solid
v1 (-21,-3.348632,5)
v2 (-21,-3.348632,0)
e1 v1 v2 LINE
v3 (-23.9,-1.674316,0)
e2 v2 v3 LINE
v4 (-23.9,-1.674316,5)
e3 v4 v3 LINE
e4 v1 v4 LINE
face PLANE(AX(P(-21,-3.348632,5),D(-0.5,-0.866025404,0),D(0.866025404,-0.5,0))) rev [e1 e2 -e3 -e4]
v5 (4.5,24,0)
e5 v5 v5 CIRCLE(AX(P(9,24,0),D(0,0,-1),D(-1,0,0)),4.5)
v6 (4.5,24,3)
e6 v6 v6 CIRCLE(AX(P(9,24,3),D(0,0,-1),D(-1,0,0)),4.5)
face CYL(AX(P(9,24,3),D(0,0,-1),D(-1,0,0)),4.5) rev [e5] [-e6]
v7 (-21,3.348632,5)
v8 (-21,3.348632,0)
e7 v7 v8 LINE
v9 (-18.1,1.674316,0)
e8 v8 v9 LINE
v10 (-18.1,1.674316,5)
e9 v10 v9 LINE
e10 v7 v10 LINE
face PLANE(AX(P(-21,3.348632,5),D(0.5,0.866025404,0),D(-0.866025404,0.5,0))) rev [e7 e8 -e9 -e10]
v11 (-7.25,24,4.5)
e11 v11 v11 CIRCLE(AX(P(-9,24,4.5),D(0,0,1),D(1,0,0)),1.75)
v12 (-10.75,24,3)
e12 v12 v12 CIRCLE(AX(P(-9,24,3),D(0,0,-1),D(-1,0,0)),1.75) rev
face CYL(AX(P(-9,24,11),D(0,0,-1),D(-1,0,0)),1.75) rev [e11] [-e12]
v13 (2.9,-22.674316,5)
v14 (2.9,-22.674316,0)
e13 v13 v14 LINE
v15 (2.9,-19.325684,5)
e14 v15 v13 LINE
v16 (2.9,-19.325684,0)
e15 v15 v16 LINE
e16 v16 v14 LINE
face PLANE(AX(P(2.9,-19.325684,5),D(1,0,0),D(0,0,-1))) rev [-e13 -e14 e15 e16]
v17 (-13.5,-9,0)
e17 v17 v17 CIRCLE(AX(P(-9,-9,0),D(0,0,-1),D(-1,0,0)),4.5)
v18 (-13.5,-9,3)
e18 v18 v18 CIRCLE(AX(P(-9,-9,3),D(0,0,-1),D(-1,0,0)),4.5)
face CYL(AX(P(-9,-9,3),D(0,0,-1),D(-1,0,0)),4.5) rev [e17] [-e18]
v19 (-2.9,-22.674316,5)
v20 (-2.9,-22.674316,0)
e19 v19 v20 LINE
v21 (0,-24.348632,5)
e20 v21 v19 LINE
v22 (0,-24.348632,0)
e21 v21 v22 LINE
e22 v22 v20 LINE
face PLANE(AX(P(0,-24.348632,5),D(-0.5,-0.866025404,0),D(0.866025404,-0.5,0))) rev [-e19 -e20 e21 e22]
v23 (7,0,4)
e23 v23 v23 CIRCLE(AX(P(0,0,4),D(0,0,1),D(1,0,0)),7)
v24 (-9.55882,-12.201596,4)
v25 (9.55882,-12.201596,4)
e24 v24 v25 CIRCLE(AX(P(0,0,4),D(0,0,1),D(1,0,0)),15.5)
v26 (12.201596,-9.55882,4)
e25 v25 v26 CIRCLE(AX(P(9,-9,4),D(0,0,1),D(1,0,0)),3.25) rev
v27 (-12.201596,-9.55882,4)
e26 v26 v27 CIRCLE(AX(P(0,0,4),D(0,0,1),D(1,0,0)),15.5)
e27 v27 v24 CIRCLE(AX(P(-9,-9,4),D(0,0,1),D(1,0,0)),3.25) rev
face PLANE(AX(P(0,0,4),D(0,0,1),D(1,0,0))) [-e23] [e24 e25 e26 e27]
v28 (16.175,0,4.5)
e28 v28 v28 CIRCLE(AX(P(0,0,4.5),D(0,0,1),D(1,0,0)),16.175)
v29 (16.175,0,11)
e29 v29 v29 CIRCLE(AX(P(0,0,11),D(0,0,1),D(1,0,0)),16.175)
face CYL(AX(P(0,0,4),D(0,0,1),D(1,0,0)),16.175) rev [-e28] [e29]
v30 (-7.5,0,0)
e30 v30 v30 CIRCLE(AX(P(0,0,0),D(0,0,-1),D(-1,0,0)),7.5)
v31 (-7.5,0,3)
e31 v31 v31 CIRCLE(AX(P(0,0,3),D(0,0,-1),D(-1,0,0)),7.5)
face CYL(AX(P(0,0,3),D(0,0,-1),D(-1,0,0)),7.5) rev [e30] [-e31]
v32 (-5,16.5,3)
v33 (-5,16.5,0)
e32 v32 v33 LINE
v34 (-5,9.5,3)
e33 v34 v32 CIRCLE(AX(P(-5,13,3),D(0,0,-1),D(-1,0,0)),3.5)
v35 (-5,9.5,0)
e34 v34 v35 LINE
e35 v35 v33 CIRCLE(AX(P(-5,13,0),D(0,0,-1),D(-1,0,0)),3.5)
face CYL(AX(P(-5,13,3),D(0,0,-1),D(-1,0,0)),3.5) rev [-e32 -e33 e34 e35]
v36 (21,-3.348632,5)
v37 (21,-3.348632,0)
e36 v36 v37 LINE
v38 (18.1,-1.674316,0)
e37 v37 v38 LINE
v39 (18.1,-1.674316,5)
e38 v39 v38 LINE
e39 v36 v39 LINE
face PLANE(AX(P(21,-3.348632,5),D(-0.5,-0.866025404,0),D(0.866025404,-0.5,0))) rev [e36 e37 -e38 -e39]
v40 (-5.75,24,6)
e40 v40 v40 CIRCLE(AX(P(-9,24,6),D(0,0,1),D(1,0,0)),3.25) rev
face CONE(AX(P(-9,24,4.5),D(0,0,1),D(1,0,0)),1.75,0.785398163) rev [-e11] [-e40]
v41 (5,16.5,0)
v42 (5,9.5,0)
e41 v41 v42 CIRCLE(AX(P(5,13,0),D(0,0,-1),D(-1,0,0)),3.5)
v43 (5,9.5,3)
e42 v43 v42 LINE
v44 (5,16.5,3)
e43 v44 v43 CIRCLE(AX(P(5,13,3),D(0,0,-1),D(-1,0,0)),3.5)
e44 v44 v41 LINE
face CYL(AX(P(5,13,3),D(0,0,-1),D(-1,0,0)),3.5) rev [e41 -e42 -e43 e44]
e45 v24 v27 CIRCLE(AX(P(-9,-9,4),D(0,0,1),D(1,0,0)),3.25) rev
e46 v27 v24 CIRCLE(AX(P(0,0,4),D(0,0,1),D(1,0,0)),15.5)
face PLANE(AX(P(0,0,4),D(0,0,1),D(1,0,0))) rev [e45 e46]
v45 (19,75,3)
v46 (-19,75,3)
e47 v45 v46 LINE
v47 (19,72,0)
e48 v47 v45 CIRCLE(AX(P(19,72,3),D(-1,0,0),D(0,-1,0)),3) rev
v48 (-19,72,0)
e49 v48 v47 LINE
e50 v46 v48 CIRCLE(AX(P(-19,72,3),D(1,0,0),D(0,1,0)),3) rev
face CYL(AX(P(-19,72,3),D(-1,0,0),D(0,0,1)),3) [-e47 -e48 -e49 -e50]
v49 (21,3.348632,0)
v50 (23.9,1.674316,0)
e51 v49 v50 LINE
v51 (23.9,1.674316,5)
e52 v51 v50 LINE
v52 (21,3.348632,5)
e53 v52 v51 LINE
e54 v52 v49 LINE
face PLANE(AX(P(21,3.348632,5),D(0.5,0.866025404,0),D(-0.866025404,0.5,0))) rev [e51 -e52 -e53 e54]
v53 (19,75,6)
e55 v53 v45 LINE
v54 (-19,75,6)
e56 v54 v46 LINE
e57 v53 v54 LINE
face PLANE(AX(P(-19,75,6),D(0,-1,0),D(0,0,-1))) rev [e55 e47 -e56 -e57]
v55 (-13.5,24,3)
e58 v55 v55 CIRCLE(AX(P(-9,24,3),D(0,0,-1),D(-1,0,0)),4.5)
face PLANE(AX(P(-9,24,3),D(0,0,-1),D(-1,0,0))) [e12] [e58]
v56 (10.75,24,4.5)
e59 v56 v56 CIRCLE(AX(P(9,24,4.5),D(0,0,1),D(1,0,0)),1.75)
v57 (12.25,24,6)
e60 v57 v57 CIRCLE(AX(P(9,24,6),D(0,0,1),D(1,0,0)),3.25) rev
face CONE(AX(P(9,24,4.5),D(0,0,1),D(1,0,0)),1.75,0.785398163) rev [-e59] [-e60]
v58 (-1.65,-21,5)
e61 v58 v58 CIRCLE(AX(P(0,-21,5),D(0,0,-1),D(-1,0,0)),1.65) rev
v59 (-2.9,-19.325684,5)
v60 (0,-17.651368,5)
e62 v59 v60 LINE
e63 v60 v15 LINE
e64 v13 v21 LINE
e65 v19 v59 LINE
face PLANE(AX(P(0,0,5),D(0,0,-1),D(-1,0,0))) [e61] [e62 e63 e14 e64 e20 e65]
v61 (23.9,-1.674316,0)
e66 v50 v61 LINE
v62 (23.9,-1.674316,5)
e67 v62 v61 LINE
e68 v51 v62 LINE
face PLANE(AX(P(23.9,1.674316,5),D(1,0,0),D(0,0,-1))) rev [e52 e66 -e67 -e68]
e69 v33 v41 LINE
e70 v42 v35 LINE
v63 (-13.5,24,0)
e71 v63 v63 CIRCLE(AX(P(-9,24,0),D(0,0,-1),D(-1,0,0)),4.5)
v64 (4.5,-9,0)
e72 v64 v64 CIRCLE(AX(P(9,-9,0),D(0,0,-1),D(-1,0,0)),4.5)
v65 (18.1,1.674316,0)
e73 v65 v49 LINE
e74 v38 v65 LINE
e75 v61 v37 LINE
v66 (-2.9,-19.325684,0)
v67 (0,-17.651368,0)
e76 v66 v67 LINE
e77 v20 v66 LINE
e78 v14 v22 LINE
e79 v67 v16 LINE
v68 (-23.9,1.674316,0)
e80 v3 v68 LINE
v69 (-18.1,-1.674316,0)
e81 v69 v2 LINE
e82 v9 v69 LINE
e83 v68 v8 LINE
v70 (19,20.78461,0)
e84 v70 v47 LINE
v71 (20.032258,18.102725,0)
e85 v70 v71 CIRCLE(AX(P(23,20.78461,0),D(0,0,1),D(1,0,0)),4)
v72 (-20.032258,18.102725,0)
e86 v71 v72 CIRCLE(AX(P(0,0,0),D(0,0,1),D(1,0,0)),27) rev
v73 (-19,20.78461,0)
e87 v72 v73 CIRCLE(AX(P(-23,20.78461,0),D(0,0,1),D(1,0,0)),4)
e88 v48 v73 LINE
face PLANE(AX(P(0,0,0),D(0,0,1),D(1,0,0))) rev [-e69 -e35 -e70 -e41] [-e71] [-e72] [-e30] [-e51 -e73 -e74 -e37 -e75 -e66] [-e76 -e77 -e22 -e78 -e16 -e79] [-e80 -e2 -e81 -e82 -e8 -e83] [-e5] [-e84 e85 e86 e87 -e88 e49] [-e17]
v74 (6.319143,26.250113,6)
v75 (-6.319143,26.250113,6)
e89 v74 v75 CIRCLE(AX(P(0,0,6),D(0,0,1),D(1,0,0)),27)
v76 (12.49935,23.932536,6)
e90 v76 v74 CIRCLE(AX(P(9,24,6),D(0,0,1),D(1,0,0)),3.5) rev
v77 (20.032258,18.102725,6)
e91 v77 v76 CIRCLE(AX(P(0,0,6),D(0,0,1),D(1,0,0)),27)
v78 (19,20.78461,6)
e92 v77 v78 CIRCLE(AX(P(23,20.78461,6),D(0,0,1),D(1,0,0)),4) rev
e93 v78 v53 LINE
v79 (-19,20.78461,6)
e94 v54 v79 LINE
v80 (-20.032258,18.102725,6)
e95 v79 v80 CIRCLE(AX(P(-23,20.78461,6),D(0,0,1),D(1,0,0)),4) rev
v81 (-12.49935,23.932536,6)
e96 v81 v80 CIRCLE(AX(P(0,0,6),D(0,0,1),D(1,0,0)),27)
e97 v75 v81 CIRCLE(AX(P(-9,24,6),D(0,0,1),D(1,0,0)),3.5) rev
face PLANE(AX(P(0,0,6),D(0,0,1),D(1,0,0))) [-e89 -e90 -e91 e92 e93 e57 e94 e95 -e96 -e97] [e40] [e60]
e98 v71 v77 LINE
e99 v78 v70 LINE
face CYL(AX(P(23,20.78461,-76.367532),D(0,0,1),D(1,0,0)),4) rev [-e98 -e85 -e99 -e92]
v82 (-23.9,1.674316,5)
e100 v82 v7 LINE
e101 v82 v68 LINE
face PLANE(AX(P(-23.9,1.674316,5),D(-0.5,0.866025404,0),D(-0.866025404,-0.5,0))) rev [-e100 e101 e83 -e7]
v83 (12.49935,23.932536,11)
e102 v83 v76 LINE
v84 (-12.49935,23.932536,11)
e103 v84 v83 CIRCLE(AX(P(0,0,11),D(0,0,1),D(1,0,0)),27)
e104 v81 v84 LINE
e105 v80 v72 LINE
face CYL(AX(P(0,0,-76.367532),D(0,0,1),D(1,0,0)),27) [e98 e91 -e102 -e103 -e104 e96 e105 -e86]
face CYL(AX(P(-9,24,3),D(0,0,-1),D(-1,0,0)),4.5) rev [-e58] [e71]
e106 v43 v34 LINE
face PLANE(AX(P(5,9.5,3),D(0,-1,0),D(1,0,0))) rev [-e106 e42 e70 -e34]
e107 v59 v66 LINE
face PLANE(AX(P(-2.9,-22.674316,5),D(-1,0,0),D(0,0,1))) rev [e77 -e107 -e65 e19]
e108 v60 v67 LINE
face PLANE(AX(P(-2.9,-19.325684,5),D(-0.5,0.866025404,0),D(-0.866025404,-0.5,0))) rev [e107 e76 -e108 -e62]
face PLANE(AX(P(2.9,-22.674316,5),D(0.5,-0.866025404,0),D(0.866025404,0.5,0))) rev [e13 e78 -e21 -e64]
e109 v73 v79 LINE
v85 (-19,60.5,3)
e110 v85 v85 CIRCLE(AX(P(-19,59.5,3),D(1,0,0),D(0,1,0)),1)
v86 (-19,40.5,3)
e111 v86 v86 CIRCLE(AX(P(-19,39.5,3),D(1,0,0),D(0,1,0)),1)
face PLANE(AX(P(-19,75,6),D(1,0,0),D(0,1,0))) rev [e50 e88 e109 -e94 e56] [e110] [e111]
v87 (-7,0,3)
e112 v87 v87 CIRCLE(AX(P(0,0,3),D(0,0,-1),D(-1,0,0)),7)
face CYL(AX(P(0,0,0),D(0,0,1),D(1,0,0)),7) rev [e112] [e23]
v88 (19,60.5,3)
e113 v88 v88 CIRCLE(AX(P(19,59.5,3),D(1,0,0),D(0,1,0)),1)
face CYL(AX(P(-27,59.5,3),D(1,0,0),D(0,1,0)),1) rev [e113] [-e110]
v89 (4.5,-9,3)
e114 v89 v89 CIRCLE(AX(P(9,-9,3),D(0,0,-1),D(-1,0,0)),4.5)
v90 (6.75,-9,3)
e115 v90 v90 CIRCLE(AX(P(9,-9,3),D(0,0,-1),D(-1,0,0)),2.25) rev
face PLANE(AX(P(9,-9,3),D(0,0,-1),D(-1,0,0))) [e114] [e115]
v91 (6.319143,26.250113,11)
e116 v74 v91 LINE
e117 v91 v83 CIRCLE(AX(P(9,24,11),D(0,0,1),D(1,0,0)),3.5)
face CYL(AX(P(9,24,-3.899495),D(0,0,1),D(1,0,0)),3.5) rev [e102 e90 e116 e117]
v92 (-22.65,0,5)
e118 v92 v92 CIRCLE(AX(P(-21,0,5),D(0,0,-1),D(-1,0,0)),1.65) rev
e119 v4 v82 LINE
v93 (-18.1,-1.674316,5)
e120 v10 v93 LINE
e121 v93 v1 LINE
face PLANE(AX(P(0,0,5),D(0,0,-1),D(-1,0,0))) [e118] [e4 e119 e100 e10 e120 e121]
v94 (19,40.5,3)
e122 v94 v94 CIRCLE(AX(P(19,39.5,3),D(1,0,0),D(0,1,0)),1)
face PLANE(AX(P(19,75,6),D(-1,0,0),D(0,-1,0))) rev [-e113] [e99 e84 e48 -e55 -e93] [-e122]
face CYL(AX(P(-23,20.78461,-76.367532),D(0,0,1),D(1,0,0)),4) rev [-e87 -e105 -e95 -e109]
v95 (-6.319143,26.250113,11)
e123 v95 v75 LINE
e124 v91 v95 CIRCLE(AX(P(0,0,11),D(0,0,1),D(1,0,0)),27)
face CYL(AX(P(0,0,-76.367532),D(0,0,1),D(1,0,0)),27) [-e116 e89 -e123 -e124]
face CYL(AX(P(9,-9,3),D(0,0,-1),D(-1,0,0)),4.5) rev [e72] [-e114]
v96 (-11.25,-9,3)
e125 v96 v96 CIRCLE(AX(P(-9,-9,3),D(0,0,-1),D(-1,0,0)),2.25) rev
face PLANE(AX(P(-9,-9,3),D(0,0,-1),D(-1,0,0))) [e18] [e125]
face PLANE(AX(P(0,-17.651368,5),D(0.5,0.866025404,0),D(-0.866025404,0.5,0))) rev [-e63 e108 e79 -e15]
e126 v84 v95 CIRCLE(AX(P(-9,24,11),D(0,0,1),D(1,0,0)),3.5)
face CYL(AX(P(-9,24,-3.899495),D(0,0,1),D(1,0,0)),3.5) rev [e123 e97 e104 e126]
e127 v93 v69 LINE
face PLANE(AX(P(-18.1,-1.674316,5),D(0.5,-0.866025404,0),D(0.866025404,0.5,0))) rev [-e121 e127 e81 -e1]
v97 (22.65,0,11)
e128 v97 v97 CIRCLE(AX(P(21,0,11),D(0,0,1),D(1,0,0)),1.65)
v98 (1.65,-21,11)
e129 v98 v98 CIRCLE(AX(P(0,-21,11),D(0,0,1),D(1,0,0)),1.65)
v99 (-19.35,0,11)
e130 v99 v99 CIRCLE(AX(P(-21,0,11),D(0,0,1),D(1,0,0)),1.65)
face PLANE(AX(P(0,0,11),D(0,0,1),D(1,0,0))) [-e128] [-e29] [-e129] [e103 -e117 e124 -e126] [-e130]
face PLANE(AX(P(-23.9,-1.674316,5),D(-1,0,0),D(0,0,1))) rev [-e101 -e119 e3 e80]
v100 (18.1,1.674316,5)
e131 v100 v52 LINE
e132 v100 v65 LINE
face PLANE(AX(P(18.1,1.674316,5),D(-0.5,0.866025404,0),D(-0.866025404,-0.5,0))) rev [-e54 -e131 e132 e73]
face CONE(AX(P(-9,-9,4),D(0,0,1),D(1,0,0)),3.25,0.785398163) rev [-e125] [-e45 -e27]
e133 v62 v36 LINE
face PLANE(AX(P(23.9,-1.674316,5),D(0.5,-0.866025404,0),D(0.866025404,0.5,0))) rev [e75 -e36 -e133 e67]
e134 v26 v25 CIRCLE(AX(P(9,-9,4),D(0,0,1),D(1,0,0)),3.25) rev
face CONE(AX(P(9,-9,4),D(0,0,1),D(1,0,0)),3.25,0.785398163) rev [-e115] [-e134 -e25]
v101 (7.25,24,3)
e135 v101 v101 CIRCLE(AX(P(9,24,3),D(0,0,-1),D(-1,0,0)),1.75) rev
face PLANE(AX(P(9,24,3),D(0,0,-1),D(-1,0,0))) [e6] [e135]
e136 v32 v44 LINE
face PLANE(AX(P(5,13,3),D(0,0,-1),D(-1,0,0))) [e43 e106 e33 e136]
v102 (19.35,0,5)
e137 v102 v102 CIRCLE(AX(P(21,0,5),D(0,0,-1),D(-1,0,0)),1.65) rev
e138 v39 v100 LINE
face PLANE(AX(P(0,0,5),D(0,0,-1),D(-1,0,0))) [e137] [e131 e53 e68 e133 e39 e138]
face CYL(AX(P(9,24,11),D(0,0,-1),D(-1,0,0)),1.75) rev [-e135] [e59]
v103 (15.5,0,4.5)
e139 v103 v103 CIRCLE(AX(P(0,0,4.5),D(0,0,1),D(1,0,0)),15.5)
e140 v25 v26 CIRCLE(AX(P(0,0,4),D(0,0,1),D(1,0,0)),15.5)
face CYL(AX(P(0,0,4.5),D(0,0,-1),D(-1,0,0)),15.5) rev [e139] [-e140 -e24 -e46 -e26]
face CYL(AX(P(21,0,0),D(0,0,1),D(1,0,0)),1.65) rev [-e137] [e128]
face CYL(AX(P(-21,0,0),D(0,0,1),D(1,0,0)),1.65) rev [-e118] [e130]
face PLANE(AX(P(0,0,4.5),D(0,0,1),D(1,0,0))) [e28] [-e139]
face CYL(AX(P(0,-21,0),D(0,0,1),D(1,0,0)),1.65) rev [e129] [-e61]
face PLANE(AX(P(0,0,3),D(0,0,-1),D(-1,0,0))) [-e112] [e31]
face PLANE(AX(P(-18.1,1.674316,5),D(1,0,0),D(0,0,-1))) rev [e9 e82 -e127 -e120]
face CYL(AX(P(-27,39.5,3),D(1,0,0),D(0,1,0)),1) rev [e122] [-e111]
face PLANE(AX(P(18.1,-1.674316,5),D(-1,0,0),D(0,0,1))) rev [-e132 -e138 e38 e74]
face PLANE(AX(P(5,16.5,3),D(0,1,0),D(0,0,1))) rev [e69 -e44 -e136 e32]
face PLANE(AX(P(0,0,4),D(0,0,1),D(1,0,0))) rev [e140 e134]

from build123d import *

# Parameters (mm, degrees)
SKETCH_1_W                    = 38
SKETCH_1_H                    = 94
EXTRUDE_604_DEPTH             = 6
CUT_EXTRUDE_1_DEPTH           = 78.601546376
CUT_EXTRUDE_1_DEPTH_BACK      = 78.601546376
SKETCH_5_R                    = 5
SKETCH_8_R                    = 27
EXTRUDE_996_DEPTH             = 5
EXTRUDE_996_DIRECTION_2_REACH = 79.602
SKETCH_6_R                    = 1.75
CUT_EXTRUDE_1278_DEPTH        = 81.467384697
SKETCH_16_R                   = 16.175
CUT_EXTRUDE_1486_DEPTH        = 7
SKETCH_7_R                    = 4.5
SKETCH_7_R_2                  = 7.5
CUT_EXTRUDE_1931_DEPTH        = 3
SKETCH_10_R                   = 3.5
CUT_EXTRUDE_2130_DEPTH        = 5
SKETCH_11_R                   = 1.65
CUT_EXTRUDE_2456_DEPTH        = 81.467384697
CUT_EXTRUDE_3_DEPTH           = 5
CHAMFER_1_SIZE                = 1.5
FILLET_5_R                    = 4
SKETCH_17_R                   = 7
CUT_EXTRUDE_3397_DEPTH        = 81.018747803
EXTRUDE_START                 = 0.5
SKETCH_18_R                   = 16.175
SKETCH_18_R_2                 = 15.5
EXTRUDE_3543_DEPTH            = 0.5
SKETCH_19_R                   = 1
CUT_EXTRUDE_3835_DEPTH        = 89.667919791
FILLET_6_R                    = 3


with BuildPart() as part:
    # Эскиз1 → Extrude 604 (new body)
    with BuildSketch(Plane.XY):
        with Locations((0, 28)):
            Rectangle(SKETCH_1_W, SKETCH_1_H)
    extrude(amount=EXTRUDE_604_DEPTH)

    # Эскиз5 → ось двигателя1 (cut, two sides: drawn at the far end of the back side and taken through both)
    with BuildSketch(Plane.XY.offset(6).offset(-CUT_EXTRUDE_1_DEPTH_BACK)):
        Circle(SKETCH_5_R)
    extrude(amount=CUT_EXTRUDE_1_DEPTH + CUT_EXTRUDE_1_DEPTH_BACK, mode=Mode.SUBTRACT)

    # Эскиз8 → Extrude 996 (add)
    with BuildSketch(Plane.XY.offset(6)):
        Circle(SKETCH_8_R)
    extrude(amount=EXTRUDE_996_DEPTH)

    # Extrude 996 direction 2: up to this face of the body (flat: up to its plane)
    extrude_996_direction_2_end = Plane(part.part.faces().sort_by_distance((0, 28.629494754, 0))[0])
    # Эскиз8 → Extrude 996 direction 2 (add, up to the picked face)
    with BuildSketch(Plane.XY.offset(6), mode=Mode.PRIVATE) as extrude_996_direction_2_sk1:
        Circle(SKETCH_8_R)
    extrude_996_direction_2_tool1 = split(extrude(extrude_996_direction_2_sk1.sketch, amount=-EXTRUDE_996_DIRECTION_2_REACH, mode=Mode.PRIVATE), bisect_by=extrude_996_direction_2_end, keep=Keep.BOTH, mode=Mode.PRIVATE)
    add(extrude_996_direction_2_tool1.solids().sort_by(Axis((0, 0, 6), (0, 0, -1)))[0])

    # Эскиз6 → Cut-Extrude 1278 (cut, through all)
    with BuildSketch(Plane(origin=(0, 0, 0), x_dir=(-1, 0, 0), z_dir=(0, 0, -1))):
        with Locations((-9, 24)):
            Circle(SKETCH_6_R)
        with Locations((9, 24)):
            Circle(SKETCH_6_R)
        with Locations((9, -9)):
            Circle(SKETCH_6_R)
        with Locations((-9, -9)):
            Circle(SKETCH_6_R)
    extrude(amount=-CUT_EXTRUDE_1278_DEPTH, mode=Mode.SUBTRACT)

    # Эскиз16 → Cut-Extrude 1486 (cut)
    with BuildSketch(Plane.XY.offset(11)):
        Circle(SKETCH_16_R)
    extrude(amount=-CUT_EXTRUDE_1486_DEPTH, mode=Mode.SUBTRACT)

    # Эскиз7 → Cut-Extrude 1931 (cut)
    with BuildSketch(Plane(origin=(0, 0, 0), x_dir=(-1, 0, 0), z_dir=(0, 0, -1))):
        with Locations((-9, 24)):
            Circle(SKETCH_7_R)
        with Locations((9, 24)):
            Circle(SKETCH_7_R)
        with Locations((-9, -9)):
            Circle(SKETCH_7_R)
        with Locations((9, -9)):
            Circle(SKETCH_7_R)
        Circle(SKETCH_7_R_2)
        with BuildLine():
            Line((-5, 16.5), (5, 16.5))
            ThreePointArc((5, 16.5), (8.5, 13), (5, 9.5))
            Line((5, 9.5), (-5, 9.5))
            ThreePointArc((-5, 9.5), (-8.5, 13), (-5, 16.5))
        make_face()
    extrude(amount=-CUT_EXTRUDE_1931_DEPTH, mode=Mode.SUBTRACT)

    # Эскиз10 → Cut-Extrude 2130 (cut)
    with BuildSketch(Plane.XY.offset(11)):
        with Locations((-9, 24)):
            Circle(SKETCH_10_R)
        with Locations((9, 24)):
            Circle(SKETCH_10_R)
    extrude(amount=-CUT_EXTRUDE_2130_DEPTH, mode=Mode.SUBTRACT)

    # Эскиз11 → Cut-Extrude 2456 (cut, through all)
    with BuildSketch(Plane.XY.offset(11)):
        with Locations((21, 0)):
            Circle(SKETCH_11_R)
        with Locations((-21, 0)):
            Circle(SKETCH_11_R)
        with Locations((0, -21)):
            Circle(SKETCH_11_R)
    extrude(amount=-CUT_EXTRUDE_2456_DEPTH, mode=Mode.SUBTRACT)

    # Эскиз12 → Вырез-Вытянуть3 (cut)
    with BuildSketch(Plane(origin=(0, 0, 0), x_dir=(-1, 0, 0), z_dir=(0, 0, -1))):
        Polygon((-18.1, 1.674315781), (-21, 3.348631561), (-23.9, 1.674315781), (-23.9, -1.674315781), (-21, -3.348631561), (-18.1, -1.674315781), align=None)
        Polygon((2.9, -19.325684219), (0, -17.651368439), (-2.9, -19.325684219), (-2.9, -22.674315781), (0, -24.348631561), (2.9, -22.674315781), align=None)
        Polygon((23.9, 1.674315781), (21, 3.348631561), (18.1, 1.674315781), (18.1, -1.674315781), (21, -3.348631561), (23.9, -1.674315781), align=None)
    extrude(amount=-CUT_EXTRUDE_3_DEPTH, mode=Mode.SUBTRACT)

    # Фаска1
    # the kernel refuses this chamfer: 1.5 mm, written as the material it takes off along each edge
    with BuildSketch(Plane(origin=(-9, 24, 6), x_dir=(-1, 0, 0), z_dir=(0, -1, 0))) as chamfer_1_piece_1:
        Polygon((1.75 + CHAMFER_1_SIZE, 0), (1.75, CHAMFER_1_SIZE), (1.75, 0), align=None)
    revolve(axis=Axis((-9, 24, 6), (0, 0, -1)), mode=Mode.SUBTRACT)
    with BuildSketch(Plane(origin=(9, -9, 4), x_dir=(-1, 0, 0), z_dir=(0, -1, 0))) as chamfer_1_piece_2:
        Polygon((1.75, CHAMFER_1_SIZE), (1.75 + CHAMFER_1_SIZE, 0), (1.75, 0), align=None)
    revolve(axis=Axis((9, -9, 4), (0, 0, -1)), mode=Mode.SUBTRACT)
    with BuildSketch(Plane(origin=(-9, -9, 4), x_dir=(-1, 0, 0), z_dir=(0, -1, 0))) as chamfer_1_piece_3:
        Polygon((1.75, CHAMFER_1_SIZE), (1.75 + CHAMFER_1_SIZE, 0), (1.75, 0), align=None)
    revolve(axis=Axis((-9, -9, 4), (0, 0, -1)), mode=Mode.SUBTRACT)
    with BuildSketch(Plane(origin=(9, 24, 6), x_dir=(-1, 0, 0), z_dir=(0, -1, 0))) as chamfer_1_piece_4:
        Polygon((1.75 + CHAMFER_1_SIZE, 0), (1.75, CHAMFER_1_SIZE), (1.75, 0), align=None)
    revolve(axis=Axis((9, 24, 6), (0, 0, -1)), mode=Mode.SUBTRACT)

    # Скругление5
    fillet_5_edges = [part.edges().sort_by_distance(p)[0] for p in [
        (-19, 19.183326093, 3),
        (19, 19.183326093, 3),
    ]]
    fillet(fillet_5_edges, radius=FILLET_5_R)

    # Эскиз17 → Cut-Extrude 3397 (cut, through all)
    with BuildSketch(Plane.XY.offset(4)):
        Circle(SKETCH_17_R)
    extrude(amount=-CUT_EXTRUDE_3397_DEPTH, mode=Mode.SUBTRACT)

    # Эскиз18 → Extrude 3543 (add)
    with BuildSketch(Plane.XY.offset(4).offset(EXTRUDE_START)):
        Circle(SKETCH_18_R)
        with Locations(Location((0, 0, 0), (0, 0, 218.075409453))):
            Circle(SKETCH_18_R_2, mode=Mode.SUBTRACT)
    extrude(amount=-EXTRUDE_3543_DEPTH)

    # Эскиз19 → Cut-Extrude 3835 (cut, through all)
    with BuildSketch(Plane(origin=(19, 0, 0), x_dir=(0, 0, -1), z_dir=(1, 0, 0))):
        with Locations(Location((-3, 59.5, 0), (0, 0, 90))):
            Circle(SKETCH_19_R)
        with Locations(Location((-3, 39.5, 0), (0, 0, 90))):
            Circle(SKETCH_19_R)
    extrude(amount=-CUT_EXTRUDE_3835_DEPTH, mode=Mode.SUBTRACT)

    # Скругление6
    fillet_6_edges = [part.edges().sort_by_distance(p)[0] for p in [
        (0, 75, 0),
    ]]
    fillet(fillet_6_edges, radius=FILLET_6_R)


solid = part.part
